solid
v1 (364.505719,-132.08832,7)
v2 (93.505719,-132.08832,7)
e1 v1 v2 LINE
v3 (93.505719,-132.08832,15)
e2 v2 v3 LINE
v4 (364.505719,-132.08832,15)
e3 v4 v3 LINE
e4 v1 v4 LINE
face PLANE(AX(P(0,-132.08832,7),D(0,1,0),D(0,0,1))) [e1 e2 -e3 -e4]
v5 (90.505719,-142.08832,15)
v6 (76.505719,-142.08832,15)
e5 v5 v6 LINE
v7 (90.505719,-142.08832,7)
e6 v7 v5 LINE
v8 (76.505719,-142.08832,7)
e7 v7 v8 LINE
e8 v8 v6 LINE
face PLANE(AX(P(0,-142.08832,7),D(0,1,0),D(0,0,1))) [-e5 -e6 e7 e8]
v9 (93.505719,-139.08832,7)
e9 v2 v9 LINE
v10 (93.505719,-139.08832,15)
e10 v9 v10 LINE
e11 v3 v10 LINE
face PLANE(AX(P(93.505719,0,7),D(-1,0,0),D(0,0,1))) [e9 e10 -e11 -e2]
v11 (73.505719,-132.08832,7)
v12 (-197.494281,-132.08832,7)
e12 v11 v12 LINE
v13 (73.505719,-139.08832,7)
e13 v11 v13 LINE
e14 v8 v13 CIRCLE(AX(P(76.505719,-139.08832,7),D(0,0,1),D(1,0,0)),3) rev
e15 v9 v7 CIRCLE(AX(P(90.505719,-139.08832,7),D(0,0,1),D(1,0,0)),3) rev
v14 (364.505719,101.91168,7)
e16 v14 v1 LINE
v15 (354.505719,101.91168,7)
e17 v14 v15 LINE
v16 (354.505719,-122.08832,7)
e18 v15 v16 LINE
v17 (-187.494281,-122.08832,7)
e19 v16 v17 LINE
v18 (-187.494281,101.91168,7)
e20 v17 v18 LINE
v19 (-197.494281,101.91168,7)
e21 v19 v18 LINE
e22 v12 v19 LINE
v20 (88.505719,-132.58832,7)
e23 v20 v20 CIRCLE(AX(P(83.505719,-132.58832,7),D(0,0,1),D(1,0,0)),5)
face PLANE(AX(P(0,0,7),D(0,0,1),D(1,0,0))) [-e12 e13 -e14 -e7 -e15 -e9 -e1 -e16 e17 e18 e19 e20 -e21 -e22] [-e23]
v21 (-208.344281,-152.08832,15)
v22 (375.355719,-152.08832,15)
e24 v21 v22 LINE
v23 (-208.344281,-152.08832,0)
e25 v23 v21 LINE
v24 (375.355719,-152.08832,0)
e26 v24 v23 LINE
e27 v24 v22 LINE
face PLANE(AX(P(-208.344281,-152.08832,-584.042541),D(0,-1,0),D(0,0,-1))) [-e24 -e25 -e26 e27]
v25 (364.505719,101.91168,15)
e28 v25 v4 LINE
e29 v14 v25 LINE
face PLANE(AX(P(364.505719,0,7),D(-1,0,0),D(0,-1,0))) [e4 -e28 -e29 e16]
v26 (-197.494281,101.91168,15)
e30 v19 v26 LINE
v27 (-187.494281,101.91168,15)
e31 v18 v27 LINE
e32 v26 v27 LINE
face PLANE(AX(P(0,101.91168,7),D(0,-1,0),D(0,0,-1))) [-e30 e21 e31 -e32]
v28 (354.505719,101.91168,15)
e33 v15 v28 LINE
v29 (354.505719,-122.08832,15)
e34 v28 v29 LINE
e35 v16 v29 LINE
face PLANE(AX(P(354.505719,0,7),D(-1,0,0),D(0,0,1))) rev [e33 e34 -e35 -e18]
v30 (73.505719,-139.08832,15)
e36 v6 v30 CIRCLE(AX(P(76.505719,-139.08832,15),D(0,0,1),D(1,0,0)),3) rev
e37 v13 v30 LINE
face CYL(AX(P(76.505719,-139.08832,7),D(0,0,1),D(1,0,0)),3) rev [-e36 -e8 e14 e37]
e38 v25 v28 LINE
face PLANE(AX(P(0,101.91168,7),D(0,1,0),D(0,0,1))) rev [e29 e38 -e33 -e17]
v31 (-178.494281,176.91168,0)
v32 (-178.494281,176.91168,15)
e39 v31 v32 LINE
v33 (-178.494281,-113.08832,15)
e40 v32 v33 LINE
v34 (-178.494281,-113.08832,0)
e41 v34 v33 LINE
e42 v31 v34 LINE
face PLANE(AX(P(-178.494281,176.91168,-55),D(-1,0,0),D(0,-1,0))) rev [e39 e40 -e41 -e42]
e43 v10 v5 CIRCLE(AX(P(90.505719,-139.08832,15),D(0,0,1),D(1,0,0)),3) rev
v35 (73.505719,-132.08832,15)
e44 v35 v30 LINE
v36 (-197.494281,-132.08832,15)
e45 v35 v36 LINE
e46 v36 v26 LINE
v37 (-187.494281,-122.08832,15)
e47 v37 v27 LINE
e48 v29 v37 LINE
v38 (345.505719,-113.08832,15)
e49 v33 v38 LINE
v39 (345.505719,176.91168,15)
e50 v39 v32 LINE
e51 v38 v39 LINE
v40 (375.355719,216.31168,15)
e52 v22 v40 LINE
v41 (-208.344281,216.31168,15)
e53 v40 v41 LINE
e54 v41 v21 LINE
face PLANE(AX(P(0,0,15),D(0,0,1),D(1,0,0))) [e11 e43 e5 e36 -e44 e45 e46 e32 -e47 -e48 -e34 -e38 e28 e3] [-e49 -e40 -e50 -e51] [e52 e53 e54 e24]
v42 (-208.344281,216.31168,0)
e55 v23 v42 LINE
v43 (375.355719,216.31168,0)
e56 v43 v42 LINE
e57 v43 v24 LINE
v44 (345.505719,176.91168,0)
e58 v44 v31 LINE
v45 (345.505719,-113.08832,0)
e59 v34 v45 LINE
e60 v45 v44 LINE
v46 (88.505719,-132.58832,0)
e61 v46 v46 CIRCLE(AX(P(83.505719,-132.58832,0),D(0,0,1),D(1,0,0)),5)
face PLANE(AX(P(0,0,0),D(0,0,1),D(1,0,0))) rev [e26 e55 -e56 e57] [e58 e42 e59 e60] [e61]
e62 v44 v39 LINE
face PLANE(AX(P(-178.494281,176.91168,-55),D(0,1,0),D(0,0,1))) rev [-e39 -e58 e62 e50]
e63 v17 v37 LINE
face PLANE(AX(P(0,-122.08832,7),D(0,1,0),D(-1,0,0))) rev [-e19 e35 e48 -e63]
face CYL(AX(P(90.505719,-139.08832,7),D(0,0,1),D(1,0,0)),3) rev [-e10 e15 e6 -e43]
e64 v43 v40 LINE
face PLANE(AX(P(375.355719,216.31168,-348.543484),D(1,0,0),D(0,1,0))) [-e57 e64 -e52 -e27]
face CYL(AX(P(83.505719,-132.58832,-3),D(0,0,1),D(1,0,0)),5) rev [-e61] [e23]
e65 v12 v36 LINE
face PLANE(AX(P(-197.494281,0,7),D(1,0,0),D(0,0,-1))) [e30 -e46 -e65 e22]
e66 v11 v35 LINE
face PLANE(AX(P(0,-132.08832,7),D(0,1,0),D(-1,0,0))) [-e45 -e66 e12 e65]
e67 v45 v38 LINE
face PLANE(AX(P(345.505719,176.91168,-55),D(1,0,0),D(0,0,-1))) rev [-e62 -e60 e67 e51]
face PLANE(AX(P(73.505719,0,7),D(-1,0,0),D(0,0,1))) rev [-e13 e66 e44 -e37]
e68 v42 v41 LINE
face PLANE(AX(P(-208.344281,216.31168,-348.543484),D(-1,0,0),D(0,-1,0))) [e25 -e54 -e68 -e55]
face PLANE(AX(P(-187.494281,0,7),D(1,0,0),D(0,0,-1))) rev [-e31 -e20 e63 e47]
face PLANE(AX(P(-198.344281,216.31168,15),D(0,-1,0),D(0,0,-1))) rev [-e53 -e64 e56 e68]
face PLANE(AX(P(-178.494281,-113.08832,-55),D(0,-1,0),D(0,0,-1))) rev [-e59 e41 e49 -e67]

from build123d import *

# Parameters (mm, degrees)
EXTRUDE_1_OUTLINE_W = 563.7
EXTRUDE_1_OUTLINE_H = 348.4
EXTRUDE_1_DEPTH     = 15
SKETCH_3_W          = 524
SKETCH_3_H          = 290
CUT_EXTRUDE_1_DEPTH = 70
SKETCH_4_W          = 10
SKETCH_4_H          = 348.4
EXTRUDE_2_DEPTH     = 15
SKETCH_5_W          = 583.7
SKETCH_5_H          = 20
EXTRUDE_3_DEPTH     = 15
SKETCH_6_W          = 10
SKETCH_6_H          = 224
CUT_EXTRUDE_2_DEPTH = 8
SKETCH_7_R          = 5
CUT_EXTRUDE_3_DEPTH = 10


# Read off the part's stored shape, not the designer's step: 填料-伸長1
with BuildPart() as part:
    # 填料-伸長1 outline → 填料-伸長1 (new body)
    with BuildSketch(Plane.XY):
        with Locations((83.50571914, 42.111680092)):
            Rectangle(EXTRUDE_1_OUTLINE_W, EXTRUDE_1_OUTLINE_H)
    extrude(amount=EXTRUDE_1_DEPTH)

    # 草圖3 → 除料-伸長1 (cut)
    with BuildSketch(Plane.XY.offset(15)):
        with Locations((83.50571914, 31.911680092)):
            Rectangle(SKETCH_3_W, SKETCH_3_H)
    extrude(amount=-CUT_EXTRUDE_1_DEPTH, mode=Mode.SUBTRACT)

    # 草圖4 → 填料-伸長2 (add)
    with BuildSketch(Plane.XY.offset(15)):
        with Locations((-203.34428086, 42.111680092)):
            Rectangle(SKETCH_4_W, SKETCH_4_H)
        with Locations((370.35571914, 42.111680092)):
            Rectangle(SKETCH_4_W, SKETCH_4_H)
    extrude(amount=-EXTRUDE_2_DEPTH)

    # 草圖5 → 填料-伸長3 (add)
    with BuildSketch(Plane.XY.offset(15)):
        with Locations((83.50571914, -142.088319908)):
            Rectangle(SKETCH_5_W, SKETCH_5_H)
    extrude(amount=-EXTRUDE_3_DEPTH)

    # 草圖6 → 除料-伸長2 (cut)
    with BuildSketch(Plane.XY.offset(15)):
        Polygon((364.50571914, -132.088319908), (364.50571914, 101.911680092), (354.50571914, 101.911680092), (354.50571914, -122.088319908), (354.50571914, -132.088319908), align=None)
        with BuildLine():
            Line((354.50571914, -132.088319908), (354.50571914, -122.088319908))
            Line((354.50571914, -122.088319908), (93.50571914, -122.088319908))
            Line((93.50571914, -122.088319908), (73.50571914, -122.088319908))
            Line((73.50571914, -122.088319908), (-187.49428086, -122.088319908))
            Line((-187.49428086, -122.088319908), (-197.49428086, -122.088319908))
            Line((-197.49428086, -122.088319908), (-197.49428086, -132.088319908))
            Line((-197.49428086, -132.088319908), (73.50571914, -132.088319908))
            Line((73.50571914, -132.088319908), (73.50571914, -139.088319908))
            ThreePointArc((73.50571914, -139.088319908), (74.384398796, -141.209640251), (76.50571914, -142.088319908))
            Line((76.50571914, -142.088319908), (90.50571914, -142.088319908))
            ThreePointArc((90.50571914, -142.088319908), (92.627039483, -141.209640251), (93.50571914, -139.088319908))
            Line((93.50571914, -139.088319908), (93.50571914, -132.088319908))
            Line((93.50571914, -132.088319908), (354.50571914, -132.088319908))
        make_face()
        with Locations((-192.49428086, -10.088319908)):
            Rectangle(SKETCH_6_W, SKETCH_6_H)
    extrude(amount=-CUT_EXTRUDE_2_DEPTH, mode=Mode.SUBTRACT)

    # 草圖7 → 除料-伸長3 (cut)
    with BuildSketch(Plane.XY.offset(7)):
        with Locations((83.50571914, -132.588319908)):
            Circle(SKETCH_7_R)
    extrude(amount=-CUT_EXTRUDE_3_DEPTH, mode=Mode.SUBTRACT)


solid = part.part
